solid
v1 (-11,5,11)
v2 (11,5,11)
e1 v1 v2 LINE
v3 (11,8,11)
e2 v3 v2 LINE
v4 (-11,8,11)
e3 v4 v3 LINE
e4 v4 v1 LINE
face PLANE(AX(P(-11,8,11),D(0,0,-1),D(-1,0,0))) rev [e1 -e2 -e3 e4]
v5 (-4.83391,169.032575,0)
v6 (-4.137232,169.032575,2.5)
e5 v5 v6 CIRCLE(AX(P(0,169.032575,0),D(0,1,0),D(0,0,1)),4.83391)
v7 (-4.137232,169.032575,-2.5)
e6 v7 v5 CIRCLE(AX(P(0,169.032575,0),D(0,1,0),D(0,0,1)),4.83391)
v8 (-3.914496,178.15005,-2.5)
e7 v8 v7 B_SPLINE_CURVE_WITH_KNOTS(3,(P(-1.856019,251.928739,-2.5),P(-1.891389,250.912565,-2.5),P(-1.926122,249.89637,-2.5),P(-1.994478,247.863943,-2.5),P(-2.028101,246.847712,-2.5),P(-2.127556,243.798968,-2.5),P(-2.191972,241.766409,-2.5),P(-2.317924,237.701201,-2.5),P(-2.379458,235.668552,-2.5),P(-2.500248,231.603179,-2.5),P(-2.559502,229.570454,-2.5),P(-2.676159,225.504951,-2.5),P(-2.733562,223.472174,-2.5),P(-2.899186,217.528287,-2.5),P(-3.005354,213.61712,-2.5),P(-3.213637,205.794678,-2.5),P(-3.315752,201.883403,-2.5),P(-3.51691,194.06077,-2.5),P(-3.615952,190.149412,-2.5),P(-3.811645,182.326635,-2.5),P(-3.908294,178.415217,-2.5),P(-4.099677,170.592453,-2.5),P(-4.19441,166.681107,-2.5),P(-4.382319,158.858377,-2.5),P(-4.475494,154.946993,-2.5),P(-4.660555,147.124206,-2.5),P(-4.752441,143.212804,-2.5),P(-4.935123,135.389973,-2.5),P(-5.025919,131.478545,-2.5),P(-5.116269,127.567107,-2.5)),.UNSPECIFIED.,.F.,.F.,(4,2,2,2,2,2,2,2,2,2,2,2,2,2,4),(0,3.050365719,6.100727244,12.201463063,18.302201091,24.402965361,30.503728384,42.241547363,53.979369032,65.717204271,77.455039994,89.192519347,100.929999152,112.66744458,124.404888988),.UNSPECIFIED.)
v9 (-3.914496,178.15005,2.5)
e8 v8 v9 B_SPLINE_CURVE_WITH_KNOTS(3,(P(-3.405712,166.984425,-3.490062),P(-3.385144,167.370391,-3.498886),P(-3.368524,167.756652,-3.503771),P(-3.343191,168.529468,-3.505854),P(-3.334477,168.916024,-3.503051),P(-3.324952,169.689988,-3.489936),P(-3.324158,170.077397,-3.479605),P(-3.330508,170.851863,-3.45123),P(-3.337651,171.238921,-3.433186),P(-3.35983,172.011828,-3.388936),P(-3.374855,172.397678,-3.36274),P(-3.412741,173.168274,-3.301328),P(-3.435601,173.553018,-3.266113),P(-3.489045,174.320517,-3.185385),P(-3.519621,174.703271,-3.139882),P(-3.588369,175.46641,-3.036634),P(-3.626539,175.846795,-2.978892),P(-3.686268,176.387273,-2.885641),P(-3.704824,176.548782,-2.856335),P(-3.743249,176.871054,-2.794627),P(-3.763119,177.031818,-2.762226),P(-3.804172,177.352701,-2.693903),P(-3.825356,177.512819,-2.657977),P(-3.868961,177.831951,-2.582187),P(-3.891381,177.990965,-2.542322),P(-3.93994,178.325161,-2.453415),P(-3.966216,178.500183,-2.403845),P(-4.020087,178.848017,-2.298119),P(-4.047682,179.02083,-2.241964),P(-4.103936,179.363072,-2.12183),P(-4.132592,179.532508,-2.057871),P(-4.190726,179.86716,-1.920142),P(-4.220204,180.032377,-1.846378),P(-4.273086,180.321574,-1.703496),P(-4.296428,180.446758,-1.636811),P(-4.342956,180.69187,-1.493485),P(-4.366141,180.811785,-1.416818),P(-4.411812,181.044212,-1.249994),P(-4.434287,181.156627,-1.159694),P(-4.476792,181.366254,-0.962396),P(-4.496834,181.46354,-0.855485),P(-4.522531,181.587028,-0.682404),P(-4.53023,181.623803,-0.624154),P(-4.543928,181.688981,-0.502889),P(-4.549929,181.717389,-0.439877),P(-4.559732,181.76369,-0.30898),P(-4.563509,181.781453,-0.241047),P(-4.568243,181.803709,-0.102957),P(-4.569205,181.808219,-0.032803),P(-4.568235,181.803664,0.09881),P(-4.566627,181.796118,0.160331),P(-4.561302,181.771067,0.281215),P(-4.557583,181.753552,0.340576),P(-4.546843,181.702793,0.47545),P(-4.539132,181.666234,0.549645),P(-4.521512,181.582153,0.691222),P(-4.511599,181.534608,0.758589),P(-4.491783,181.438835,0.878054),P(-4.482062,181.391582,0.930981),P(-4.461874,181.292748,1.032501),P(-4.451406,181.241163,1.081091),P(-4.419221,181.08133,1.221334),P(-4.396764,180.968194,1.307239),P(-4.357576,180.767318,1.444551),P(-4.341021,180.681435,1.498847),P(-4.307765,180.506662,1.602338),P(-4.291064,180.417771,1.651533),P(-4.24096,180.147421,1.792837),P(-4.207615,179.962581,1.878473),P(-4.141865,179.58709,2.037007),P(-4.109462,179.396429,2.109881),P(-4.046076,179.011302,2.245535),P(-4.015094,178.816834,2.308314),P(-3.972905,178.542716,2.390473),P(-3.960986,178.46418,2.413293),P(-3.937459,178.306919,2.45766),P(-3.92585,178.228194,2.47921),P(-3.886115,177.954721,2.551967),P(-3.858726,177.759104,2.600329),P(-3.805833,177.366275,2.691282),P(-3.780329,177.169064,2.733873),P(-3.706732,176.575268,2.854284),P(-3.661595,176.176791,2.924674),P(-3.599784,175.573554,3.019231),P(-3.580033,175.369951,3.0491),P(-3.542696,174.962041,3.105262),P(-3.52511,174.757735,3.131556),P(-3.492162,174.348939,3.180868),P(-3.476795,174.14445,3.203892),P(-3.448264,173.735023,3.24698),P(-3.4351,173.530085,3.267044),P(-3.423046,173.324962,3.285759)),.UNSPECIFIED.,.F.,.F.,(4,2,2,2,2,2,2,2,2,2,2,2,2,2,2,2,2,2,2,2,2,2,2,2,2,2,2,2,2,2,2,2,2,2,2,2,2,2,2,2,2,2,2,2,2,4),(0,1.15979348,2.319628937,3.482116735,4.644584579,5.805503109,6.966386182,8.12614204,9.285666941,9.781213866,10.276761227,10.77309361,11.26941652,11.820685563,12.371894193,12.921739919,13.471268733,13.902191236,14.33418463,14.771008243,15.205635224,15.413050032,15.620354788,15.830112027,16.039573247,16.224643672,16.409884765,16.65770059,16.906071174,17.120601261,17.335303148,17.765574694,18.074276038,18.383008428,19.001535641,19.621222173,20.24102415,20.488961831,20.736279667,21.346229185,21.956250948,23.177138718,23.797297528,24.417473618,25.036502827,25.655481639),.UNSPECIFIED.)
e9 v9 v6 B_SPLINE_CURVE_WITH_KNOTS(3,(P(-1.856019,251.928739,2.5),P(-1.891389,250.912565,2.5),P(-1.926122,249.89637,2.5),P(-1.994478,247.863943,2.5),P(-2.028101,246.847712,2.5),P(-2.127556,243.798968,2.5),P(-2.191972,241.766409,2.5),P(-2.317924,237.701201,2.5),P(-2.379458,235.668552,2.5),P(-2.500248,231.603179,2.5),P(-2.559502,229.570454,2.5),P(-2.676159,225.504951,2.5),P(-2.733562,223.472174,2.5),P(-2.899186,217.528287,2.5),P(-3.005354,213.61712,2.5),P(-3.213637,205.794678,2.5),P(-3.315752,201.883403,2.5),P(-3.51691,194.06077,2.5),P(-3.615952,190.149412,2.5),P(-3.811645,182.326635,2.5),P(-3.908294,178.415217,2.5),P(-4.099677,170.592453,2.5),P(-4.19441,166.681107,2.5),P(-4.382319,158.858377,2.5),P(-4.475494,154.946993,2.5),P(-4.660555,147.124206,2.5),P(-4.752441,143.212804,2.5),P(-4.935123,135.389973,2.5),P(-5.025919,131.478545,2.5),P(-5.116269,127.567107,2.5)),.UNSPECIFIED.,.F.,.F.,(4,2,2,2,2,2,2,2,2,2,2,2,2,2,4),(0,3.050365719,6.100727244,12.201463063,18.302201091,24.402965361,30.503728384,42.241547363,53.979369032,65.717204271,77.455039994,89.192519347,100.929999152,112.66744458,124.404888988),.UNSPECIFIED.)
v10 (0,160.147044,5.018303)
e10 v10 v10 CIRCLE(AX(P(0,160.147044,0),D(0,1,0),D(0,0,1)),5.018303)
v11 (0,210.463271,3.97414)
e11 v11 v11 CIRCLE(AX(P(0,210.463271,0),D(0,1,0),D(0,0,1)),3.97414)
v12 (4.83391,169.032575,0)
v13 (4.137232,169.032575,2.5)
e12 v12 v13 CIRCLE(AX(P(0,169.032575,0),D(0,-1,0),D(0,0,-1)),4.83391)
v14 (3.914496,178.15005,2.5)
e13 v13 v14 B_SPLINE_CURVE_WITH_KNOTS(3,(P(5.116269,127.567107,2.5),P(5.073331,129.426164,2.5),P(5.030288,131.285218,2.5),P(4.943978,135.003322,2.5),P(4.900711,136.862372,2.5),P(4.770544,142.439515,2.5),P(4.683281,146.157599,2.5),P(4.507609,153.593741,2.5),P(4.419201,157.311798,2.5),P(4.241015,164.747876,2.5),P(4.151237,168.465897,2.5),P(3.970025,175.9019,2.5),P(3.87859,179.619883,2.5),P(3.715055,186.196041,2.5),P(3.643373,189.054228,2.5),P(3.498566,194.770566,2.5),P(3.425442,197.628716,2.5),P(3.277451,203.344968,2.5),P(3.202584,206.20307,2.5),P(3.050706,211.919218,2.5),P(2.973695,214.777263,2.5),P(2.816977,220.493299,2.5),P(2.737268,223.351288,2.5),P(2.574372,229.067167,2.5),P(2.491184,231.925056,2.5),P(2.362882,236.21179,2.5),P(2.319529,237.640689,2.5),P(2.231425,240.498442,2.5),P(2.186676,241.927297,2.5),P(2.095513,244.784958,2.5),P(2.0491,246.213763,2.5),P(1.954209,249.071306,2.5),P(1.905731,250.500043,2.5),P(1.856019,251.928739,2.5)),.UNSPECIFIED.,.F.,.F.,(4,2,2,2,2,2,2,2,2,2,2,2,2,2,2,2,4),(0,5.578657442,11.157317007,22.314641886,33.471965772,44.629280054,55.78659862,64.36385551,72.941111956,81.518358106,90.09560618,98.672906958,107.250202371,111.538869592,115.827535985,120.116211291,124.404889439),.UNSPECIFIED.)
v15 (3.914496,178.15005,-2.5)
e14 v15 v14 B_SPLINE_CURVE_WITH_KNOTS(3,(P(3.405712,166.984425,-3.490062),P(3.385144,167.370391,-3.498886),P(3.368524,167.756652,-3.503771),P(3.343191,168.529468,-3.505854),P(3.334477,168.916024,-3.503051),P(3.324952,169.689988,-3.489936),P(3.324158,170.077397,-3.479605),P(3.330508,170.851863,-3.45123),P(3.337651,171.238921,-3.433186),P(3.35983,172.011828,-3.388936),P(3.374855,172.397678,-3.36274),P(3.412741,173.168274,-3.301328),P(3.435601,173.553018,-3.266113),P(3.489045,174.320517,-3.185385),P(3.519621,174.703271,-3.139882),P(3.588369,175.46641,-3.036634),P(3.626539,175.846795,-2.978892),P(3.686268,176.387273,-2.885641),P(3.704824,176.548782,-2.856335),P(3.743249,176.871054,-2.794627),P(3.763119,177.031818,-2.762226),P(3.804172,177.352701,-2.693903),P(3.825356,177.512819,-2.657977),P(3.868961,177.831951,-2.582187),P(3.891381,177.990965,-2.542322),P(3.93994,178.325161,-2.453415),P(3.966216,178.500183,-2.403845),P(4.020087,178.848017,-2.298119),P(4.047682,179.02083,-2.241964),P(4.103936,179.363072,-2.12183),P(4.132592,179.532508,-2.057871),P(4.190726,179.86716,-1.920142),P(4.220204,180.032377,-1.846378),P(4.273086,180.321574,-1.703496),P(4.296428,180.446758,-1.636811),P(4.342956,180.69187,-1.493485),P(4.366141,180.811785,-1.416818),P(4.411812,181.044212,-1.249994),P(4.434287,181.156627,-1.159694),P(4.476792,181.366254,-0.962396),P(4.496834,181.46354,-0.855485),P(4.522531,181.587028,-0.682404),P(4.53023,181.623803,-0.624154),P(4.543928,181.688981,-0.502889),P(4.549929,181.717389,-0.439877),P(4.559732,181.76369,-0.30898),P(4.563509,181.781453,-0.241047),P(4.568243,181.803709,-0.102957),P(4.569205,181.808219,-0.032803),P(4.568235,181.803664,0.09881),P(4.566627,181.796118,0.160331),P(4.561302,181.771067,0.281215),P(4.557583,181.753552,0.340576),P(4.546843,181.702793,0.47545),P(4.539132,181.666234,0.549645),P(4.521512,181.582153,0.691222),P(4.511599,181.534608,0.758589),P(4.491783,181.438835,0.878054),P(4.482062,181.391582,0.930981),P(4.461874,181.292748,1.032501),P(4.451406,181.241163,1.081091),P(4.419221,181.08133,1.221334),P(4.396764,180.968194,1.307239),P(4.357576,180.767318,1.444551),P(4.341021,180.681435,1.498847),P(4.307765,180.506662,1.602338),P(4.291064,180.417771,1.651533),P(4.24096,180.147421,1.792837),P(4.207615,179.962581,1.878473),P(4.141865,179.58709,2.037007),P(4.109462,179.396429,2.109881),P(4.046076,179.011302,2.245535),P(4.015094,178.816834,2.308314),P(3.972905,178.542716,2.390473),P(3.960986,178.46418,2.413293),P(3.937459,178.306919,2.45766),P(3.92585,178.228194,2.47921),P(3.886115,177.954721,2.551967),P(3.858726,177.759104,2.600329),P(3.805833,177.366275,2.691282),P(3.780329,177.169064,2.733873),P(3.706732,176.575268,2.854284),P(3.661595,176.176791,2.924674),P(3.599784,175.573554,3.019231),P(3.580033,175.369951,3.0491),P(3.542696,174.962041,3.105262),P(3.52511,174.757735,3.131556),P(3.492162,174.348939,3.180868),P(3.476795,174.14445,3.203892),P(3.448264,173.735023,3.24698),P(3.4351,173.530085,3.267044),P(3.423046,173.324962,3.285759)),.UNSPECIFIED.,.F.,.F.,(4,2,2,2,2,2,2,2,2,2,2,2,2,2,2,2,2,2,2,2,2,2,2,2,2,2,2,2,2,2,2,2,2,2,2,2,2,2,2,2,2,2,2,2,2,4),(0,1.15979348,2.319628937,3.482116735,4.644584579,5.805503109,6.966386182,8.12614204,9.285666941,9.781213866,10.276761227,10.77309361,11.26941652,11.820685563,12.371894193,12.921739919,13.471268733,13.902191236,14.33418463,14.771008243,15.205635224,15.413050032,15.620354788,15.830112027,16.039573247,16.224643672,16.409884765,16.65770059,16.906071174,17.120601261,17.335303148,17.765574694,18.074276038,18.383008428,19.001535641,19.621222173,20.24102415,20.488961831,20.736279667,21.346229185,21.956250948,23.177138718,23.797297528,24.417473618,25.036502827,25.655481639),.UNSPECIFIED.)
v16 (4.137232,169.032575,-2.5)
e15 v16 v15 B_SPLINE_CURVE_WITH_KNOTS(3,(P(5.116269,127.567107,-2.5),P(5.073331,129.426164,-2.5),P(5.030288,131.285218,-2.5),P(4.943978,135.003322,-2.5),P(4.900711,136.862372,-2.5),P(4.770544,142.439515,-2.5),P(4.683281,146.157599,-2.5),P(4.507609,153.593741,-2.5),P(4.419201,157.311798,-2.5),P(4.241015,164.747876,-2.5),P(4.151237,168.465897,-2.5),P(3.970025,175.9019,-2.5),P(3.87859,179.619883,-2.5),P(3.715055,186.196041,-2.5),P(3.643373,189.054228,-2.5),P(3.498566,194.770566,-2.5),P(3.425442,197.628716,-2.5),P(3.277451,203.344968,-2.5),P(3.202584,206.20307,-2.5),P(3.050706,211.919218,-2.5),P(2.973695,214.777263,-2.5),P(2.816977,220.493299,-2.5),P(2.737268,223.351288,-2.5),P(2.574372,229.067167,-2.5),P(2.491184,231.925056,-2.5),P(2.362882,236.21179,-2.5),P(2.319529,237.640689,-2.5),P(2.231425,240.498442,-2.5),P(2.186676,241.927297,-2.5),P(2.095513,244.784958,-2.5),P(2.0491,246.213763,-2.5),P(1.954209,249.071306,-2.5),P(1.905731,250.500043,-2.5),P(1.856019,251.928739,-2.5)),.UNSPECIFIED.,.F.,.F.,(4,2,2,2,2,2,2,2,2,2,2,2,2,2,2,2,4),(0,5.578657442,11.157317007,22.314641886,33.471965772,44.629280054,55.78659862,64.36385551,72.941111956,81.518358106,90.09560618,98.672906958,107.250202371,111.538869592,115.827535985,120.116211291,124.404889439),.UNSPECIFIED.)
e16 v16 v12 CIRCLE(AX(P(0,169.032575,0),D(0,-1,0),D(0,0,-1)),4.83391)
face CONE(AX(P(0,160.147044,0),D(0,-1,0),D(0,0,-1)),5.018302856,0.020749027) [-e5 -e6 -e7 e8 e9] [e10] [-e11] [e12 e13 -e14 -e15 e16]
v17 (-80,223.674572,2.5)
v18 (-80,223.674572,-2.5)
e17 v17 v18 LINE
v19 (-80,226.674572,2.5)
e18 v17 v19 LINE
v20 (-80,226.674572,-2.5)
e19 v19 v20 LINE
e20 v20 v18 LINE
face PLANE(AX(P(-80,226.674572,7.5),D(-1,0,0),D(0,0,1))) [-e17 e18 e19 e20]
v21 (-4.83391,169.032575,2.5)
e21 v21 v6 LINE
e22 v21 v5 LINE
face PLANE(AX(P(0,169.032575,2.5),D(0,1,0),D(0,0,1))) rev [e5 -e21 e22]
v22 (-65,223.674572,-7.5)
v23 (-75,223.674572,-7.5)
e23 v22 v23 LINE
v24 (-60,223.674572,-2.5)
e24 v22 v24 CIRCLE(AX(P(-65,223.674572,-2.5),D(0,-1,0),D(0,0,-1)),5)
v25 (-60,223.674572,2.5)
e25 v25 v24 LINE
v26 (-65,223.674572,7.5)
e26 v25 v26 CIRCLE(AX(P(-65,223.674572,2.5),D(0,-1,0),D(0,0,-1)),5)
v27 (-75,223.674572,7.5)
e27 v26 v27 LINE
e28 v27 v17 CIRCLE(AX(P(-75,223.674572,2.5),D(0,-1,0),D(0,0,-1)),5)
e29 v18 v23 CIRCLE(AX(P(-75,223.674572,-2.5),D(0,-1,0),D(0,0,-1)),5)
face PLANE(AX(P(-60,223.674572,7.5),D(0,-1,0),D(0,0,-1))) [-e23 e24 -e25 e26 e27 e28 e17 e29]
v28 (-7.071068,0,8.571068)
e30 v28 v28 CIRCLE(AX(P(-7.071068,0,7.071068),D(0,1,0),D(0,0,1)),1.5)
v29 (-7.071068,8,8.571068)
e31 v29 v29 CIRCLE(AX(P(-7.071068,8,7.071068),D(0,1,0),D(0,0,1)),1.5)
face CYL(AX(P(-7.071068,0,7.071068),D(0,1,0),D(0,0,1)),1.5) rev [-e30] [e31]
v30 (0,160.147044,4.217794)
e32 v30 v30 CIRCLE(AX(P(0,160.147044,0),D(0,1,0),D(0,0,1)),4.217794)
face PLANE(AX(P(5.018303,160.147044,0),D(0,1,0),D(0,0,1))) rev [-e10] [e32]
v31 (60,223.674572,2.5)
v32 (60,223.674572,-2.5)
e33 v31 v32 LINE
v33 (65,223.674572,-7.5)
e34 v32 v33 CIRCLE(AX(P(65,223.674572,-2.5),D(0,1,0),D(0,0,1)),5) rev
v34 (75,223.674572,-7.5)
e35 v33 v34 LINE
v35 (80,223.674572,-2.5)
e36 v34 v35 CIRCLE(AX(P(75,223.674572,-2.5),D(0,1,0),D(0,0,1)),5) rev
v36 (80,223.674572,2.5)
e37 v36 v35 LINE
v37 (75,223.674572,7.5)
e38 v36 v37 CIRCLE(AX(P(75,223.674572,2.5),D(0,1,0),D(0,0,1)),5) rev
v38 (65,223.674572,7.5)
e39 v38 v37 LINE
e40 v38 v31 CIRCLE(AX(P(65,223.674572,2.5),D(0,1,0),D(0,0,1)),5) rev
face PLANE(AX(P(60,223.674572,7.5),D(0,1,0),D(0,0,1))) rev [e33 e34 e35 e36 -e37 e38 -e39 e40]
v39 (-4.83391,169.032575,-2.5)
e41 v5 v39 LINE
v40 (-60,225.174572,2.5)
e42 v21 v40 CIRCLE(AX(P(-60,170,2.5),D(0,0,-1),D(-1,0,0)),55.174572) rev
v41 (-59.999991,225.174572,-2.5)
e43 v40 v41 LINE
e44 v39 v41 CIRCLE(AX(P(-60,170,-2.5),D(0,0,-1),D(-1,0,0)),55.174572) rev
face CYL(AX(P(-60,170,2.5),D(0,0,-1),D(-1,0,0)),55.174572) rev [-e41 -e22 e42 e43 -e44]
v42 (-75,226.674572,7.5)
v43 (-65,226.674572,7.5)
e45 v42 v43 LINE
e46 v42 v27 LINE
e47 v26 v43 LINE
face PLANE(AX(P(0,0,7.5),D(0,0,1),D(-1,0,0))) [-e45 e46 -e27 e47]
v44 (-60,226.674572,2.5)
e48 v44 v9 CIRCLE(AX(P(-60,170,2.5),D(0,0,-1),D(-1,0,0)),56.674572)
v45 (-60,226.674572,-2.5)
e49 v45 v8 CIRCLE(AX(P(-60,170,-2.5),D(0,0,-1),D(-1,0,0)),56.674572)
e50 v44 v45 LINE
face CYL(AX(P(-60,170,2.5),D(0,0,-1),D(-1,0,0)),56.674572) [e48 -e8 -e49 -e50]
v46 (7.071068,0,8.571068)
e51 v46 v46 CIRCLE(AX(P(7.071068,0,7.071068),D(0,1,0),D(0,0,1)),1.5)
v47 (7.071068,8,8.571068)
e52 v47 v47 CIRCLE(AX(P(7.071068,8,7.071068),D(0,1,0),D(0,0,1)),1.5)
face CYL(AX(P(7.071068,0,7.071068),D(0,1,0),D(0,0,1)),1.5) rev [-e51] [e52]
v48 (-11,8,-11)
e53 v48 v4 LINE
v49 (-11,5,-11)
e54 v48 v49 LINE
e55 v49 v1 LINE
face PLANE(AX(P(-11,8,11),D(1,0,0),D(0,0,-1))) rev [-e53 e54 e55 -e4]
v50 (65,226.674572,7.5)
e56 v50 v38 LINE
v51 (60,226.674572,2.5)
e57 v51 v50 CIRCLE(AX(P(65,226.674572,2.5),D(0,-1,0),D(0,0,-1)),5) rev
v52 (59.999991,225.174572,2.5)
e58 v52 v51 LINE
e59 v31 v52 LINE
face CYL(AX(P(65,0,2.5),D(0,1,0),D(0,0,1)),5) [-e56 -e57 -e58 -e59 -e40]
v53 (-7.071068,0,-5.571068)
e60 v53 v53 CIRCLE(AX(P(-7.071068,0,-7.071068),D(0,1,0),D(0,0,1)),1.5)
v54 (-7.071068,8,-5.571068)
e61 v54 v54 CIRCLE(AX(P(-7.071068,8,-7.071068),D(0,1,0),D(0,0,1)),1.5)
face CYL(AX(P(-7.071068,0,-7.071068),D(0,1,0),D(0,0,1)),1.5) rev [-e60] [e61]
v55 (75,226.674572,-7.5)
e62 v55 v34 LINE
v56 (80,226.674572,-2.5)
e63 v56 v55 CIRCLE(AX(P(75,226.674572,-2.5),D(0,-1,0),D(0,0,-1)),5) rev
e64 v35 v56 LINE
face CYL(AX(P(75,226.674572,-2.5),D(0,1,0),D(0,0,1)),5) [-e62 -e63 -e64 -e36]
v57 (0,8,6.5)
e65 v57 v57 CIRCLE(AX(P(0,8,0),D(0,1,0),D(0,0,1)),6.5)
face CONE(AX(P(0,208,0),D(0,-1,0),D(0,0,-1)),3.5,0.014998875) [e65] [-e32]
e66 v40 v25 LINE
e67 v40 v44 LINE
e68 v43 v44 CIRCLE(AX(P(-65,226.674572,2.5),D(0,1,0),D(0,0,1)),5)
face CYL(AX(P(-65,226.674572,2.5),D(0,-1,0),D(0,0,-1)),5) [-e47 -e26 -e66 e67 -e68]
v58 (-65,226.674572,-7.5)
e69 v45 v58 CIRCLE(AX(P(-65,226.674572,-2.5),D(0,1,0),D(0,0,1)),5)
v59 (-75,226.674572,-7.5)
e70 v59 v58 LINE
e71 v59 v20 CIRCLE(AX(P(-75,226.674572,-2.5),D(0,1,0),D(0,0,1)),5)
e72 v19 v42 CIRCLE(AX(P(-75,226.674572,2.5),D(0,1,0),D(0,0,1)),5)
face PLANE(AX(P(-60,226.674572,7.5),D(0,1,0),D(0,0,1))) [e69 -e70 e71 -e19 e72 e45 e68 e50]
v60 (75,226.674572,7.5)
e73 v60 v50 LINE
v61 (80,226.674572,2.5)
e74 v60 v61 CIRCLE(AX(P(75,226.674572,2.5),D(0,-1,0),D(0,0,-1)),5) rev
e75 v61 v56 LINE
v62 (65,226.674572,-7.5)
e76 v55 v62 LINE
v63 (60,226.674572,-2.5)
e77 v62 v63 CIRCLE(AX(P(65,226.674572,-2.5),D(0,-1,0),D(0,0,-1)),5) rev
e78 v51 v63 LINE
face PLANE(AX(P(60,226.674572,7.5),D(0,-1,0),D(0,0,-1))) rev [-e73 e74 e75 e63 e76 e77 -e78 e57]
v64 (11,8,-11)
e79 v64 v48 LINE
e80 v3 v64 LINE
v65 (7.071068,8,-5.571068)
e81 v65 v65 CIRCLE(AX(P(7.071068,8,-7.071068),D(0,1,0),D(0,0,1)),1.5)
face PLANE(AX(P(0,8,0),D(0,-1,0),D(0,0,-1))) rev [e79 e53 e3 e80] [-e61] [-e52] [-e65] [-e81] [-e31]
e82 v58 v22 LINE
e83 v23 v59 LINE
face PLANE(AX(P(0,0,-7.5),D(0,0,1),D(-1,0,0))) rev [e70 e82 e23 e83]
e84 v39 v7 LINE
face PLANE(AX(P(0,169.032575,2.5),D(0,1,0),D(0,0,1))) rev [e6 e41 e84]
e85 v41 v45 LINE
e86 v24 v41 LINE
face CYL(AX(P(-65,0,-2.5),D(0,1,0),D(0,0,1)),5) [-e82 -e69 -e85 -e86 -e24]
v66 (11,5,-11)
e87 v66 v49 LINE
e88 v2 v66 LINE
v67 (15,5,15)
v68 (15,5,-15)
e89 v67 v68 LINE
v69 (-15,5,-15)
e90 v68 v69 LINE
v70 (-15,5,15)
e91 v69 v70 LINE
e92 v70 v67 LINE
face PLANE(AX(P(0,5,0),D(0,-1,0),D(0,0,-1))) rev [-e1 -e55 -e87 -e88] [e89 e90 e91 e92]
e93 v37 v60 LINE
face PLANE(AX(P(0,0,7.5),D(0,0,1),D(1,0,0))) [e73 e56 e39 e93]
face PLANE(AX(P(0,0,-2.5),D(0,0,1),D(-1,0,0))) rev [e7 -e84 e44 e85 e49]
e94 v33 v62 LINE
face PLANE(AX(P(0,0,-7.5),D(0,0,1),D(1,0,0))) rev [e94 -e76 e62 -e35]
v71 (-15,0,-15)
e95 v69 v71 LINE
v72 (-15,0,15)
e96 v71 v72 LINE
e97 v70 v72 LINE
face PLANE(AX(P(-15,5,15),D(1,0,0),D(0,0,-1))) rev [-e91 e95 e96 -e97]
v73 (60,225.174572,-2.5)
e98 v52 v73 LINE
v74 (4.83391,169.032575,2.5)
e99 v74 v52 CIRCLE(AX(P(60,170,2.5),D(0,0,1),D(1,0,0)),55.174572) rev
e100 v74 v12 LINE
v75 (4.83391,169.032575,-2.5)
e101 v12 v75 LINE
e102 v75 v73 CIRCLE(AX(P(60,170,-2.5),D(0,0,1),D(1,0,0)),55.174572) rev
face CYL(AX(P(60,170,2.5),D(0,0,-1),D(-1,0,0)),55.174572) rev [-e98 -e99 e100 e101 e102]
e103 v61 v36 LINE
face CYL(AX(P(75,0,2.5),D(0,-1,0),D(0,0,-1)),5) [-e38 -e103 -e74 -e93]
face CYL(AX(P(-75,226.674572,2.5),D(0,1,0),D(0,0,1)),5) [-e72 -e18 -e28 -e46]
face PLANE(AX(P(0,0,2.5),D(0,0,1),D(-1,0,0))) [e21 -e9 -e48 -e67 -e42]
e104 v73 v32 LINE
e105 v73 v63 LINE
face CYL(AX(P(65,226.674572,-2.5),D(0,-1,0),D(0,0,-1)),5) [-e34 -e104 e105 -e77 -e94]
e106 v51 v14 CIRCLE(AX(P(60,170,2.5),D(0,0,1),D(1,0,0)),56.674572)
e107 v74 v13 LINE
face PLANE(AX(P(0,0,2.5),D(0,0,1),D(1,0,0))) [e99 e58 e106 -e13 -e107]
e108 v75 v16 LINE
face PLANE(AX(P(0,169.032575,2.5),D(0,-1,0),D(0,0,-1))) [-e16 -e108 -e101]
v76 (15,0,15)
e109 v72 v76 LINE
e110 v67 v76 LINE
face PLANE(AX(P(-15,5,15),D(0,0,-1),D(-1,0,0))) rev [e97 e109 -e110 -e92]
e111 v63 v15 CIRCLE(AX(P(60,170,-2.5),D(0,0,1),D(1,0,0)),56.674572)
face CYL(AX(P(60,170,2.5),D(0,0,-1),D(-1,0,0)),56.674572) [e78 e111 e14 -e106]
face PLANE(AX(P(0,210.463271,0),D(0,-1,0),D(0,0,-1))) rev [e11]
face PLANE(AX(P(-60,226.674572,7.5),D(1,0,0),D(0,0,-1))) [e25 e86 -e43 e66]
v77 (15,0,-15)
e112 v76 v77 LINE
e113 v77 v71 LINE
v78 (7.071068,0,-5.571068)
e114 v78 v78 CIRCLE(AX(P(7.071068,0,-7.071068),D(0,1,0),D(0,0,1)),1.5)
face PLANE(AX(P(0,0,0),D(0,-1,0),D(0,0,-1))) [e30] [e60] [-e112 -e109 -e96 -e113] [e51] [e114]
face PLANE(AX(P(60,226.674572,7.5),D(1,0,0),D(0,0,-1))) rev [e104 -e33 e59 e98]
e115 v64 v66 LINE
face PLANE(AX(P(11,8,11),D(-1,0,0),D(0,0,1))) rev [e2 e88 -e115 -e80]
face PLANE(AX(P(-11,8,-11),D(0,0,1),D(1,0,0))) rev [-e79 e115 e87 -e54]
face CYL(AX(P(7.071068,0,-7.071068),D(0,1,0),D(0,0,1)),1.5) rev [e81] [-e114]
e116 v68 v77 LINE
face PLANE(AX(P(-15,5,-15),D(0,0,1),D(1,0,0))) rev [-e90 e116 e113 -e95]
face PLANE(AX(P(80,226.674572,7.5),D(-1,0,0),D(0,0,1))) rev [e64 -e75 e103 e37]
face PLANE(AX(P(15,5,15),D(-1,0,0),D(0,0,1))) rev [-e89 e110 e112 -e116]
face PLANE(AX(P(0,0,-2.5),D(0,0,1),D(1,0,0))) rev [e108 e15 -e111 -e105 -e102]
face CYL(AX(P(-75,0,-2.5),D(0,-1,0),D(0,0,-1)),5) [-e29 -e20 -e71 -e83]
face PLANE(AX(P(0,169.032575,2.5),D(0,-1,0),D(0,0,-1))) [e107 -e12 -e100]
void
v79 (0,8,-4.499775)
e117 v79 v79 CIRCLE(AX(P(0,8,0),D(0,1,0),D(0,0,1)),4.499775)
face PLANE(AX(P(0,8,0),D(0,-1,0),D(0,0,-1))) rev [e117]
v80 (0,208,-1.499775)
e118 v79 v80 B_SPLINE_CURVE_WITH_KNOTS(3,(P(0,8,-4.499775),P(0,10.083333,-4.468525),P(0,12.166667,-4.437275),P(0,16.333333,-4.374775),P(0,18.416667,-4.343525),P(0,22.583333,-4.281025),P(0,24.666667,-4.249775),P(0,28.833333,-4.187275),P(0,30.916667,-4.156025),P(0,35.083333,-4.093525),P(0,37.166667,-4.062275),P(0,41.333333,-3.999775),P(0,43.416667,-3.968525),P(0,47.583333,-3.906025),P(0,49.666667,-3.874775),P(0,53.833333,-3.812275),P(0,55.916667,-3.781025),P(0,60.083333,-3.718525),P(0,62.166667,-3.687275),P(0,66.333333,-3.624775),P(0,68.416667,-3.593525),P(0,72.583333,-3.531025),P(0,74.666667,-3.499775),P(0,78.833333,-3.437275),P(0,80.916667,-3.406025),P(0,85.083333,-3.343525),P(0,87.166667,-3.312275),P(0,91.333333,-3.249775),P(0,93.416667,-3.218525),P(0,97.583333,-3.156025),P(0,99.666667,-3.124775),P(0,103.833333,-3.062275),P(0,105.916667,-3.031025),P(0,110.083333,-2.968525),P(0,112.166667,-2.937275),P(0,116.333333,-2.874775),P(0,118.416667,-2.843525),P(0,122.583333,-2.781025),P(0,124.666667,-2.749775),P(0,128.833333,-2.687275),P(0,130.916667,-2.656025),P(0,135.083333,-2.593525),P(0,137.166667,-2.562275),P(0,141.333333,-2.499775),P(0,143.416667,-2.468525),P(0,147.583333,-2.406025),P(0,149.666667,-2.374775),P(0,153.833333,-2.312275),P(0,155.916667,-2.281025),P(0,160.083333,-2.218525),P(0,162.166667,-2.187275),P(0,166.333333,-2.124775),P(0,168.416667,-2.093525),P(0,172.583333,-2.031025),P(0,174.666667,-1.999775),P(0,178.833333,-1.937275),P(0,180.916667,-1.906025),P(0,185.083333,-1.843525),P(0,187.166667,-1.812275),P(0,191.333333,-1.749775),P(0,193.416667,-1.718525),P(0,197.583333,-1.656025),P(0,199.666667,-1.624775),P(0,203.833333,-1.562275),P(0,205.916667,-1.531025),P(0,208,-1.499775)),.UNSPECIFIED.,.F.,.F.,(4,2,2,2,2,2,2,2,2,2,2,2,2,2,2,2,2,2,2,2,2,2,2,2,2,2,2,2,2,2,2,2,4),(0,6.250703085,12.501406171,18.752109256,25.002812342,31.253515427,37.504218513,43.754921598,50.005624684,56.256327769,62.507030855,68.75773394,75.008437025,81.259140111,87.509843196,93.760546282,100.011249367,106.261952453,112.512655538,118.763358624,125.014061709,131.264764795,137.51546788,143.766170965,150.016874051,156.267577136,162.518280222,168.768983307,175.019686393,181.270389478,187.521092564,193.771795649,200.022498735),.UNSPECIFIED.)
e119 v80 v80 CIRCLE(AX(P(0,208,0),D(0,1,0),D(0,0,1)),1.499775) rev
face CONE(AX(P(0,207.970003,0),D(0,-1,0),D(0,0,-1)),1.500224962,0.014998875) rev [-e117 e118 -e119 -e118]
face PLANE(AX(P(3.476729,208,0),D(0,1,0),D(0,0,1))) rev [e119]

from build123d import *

# Parameters (mm, degrees)
SKETCH3_W           = 30
SKETCH3_H           = 30
BOSS_EXTRUDE2_DEPTH = 5
SKETCH4_W           = 22
SKETCH4_H           = 22
BOSS_EXTRUDE3_DEPTH = 3
SKETCH10_R          = 1.5
CUT_EXTRUDE2_DEPTH  = 23.671568098
BOSS_EXTRUDE4_DEPTH = 2.5
SKETCH13_W          = 20
SKETCH13_H          = 3
BOSS_EXTRUDE6_DEPTH = 7.5
FILLET1_R           = 5
MIRROR2_START       = 223.674571743
MIRROR2_OUTLINE_W   = 20
MIRROR2_OUTLINE_H   = 15
MIRROR2_DEPTH       = 3
FILLET2_R           = 5


# Read off the part's stored shape, not the designer's step: Loft-Thin2, Mirror2
with BuildPart() as part:
    # Sketch3 → Boss-Extrude2 (new body)
    with BuildSketch(Plane(origin=(0, 0, 0), x_dir=(1, 0, 0), z_dir=(0, 1, 0))):
        Rectangle(SKETCH3_W, SKETCH3_H)
    extrude(amount=BOSS_EXTRUDE2_DEPTH)

    # Sketch4 → Boss-Extrude3 (add)
    with BuildSketch(Plane(origin=(0, 5, 0), x_dir=(1, 0, 0), z_dir=(0, 1, 0))):
        Rectangle(SKETCH4_W, SKETCH4_H)
    extrude(amount=BOSS_EXTRUDE3_DEPTH)

    # Sketch10 → Cut-Extrude2 (cut, through all)
    with BuildSketch(Plane(origin=(0, 8, 0), x_dir=(1, 0, 0), z_dir=(0, 1, 0))):
        with Locations(Location((-7.071067812, -7.071067812, 0), (0, 0, 270))):
            Circle(SKETCH10_R)
        with Locations(Location((-7.071067812, 7.071067812, 0), (0, 0, 270))):
            Circle(SKETCH10_R)
        with Locations(Location((7.071067812, 7.071067812, 0), (0, 0, 270))):
            Circle(SKETCH10_R)
        with Locations(Location((7.071067812, -7.071067812, 0), (0, 0, 270))):
            Circle(SKETCH10_R)
    extrude(amount=-CUT_EXTRUDE2_DEPTH, mode=Mode.SUBTRACT)

    # Loft-Thin2 outline → Loft-Thin2 (revolve)
    with BuildSketch(Plane.XY):
        Polygon((3.5, 208), (1.499775013, 208), (4.499775013, 8), (6.5, 8), align=None)
    revolve(axis=Axis((0, 0, 0), (0, 1, 0)))

    # Sketch11 → Revolve1 (revolve)
    with BuildSketch(Plane.XY, mode=Mode.PRIVATE) as revolve1_sk:
        Polygon((0, 210.463271105), (3.974140239, 210.463271105), (5.018302856, 160.147044177), (4.217794337, 160.147044177), (3.476729187, 208), (0, 208), align=None)
    revolve(revolve1_sk.sketch.rotate(Axis((0, 233.744226316, 0), (0, -1, 0)), 90), axis=Axis((0, 233.744226316, 0), (0, -1, 0)))

    # Sketch12 → Boss-Extrude4 (add, symmetric)
    with BuildSketch(Plane.XY):
        with BuildLine():
            ThreePointArc((4.833910275, 169.032574831), (20.64513273, 208.670761425), (59.999990588, 225.174571743))
            Line((59.999990588, 225.174571743), (60, 226.674571743))
            ThreePointArc((60, 226.674571743), (19.584436851, 209.731465334), (3.333685749, 169.032574831))
            Line((3.333685749, 169.032574831), (4.833910275, 169.032574831))
        make_face()
    boss_extrude4 = extrude(amount=BOSS_EXTRUDE4_DEPTH, both=True)

    # Mirror1: Boss-Extrude4 across plane
    add(boss_extrude4.mirror(Plane(origin=(0, 0, 0), x_dir=(0, 0, 1), z_dir=(1, 0, 0))))


with BuildPart() as boss_extrude6_tool:
    # Sketch13 → Boss-Extrude6 (new, symmetric)
    with BuildSketch(Plane.XY):
        with Locations((70, 225.174571743)):
            Rectangle(SKETCH13_W, SKETCH13_H)
    extrude(amount=BOSS_EXTRUDE6_DEPTH, both=True)


with BuildPart() as part_1:
    add(part.part)


with BuildPart() as part_2:
    # Boss-Extrude6: joined with boss_extrude6_tool
    add(part_1.part.fuse(boss_extrude6_tool.part, tol=0.00001))

    # Fillet1
    fillet1_edges = [part_2.edges().sort_by_distance(p)[0] for p in [
        (60, 225.174571743, -7.5),
        (80, 225.174571743, -7.5),
        (80, 225.174571743, 7.5),
        (60, 225.174571743, 7.5),
    ]]
    fillet(fillet1_edges, radius=FILLET1_R - 0.0001)  # a hair under: the kernel refuses the full size


with BuildPart() as mirror2_tool:
    # Mirror2 outline → Mirror2 (new body)
    with BuildSketch(Plane(origin=(0, 0, 0), x_dir=(1, 0, 0), z_dir=(0, 1, 0)).offset(MIRROR2_START)):
        with Locations((-70, 0)):
            Rectangle(MIRROR2_OUTLINE_W, MIRROR2_OUTLINE_H)
    extrude(amount=MIRROR2_DEPTH)


with BuildPart() as part_3:
    add(part_2.part)


with BuildPart() as part_4:
    # Mirror2: joined with mirror2_tool
    add(part_3.part.fuse(mirror2_tool.part, tol=0.00001))

    # Fillet2
    fillet2_edges = [part_4.edges().sort_by_distance(p)[0] for p in [
        (-60, 225.174571743, -7.5),
        (-80, 225.174571743, -7.5),
        (-60, 225.174571743, 7.5),
        (-80, 225.174571743, 7.5),
    ]]
    fillet(fillet2_edges, radius=FILLET2_R - 0.0001)  # a hair under: the kernel refuses the full size


solid = part_4.part
